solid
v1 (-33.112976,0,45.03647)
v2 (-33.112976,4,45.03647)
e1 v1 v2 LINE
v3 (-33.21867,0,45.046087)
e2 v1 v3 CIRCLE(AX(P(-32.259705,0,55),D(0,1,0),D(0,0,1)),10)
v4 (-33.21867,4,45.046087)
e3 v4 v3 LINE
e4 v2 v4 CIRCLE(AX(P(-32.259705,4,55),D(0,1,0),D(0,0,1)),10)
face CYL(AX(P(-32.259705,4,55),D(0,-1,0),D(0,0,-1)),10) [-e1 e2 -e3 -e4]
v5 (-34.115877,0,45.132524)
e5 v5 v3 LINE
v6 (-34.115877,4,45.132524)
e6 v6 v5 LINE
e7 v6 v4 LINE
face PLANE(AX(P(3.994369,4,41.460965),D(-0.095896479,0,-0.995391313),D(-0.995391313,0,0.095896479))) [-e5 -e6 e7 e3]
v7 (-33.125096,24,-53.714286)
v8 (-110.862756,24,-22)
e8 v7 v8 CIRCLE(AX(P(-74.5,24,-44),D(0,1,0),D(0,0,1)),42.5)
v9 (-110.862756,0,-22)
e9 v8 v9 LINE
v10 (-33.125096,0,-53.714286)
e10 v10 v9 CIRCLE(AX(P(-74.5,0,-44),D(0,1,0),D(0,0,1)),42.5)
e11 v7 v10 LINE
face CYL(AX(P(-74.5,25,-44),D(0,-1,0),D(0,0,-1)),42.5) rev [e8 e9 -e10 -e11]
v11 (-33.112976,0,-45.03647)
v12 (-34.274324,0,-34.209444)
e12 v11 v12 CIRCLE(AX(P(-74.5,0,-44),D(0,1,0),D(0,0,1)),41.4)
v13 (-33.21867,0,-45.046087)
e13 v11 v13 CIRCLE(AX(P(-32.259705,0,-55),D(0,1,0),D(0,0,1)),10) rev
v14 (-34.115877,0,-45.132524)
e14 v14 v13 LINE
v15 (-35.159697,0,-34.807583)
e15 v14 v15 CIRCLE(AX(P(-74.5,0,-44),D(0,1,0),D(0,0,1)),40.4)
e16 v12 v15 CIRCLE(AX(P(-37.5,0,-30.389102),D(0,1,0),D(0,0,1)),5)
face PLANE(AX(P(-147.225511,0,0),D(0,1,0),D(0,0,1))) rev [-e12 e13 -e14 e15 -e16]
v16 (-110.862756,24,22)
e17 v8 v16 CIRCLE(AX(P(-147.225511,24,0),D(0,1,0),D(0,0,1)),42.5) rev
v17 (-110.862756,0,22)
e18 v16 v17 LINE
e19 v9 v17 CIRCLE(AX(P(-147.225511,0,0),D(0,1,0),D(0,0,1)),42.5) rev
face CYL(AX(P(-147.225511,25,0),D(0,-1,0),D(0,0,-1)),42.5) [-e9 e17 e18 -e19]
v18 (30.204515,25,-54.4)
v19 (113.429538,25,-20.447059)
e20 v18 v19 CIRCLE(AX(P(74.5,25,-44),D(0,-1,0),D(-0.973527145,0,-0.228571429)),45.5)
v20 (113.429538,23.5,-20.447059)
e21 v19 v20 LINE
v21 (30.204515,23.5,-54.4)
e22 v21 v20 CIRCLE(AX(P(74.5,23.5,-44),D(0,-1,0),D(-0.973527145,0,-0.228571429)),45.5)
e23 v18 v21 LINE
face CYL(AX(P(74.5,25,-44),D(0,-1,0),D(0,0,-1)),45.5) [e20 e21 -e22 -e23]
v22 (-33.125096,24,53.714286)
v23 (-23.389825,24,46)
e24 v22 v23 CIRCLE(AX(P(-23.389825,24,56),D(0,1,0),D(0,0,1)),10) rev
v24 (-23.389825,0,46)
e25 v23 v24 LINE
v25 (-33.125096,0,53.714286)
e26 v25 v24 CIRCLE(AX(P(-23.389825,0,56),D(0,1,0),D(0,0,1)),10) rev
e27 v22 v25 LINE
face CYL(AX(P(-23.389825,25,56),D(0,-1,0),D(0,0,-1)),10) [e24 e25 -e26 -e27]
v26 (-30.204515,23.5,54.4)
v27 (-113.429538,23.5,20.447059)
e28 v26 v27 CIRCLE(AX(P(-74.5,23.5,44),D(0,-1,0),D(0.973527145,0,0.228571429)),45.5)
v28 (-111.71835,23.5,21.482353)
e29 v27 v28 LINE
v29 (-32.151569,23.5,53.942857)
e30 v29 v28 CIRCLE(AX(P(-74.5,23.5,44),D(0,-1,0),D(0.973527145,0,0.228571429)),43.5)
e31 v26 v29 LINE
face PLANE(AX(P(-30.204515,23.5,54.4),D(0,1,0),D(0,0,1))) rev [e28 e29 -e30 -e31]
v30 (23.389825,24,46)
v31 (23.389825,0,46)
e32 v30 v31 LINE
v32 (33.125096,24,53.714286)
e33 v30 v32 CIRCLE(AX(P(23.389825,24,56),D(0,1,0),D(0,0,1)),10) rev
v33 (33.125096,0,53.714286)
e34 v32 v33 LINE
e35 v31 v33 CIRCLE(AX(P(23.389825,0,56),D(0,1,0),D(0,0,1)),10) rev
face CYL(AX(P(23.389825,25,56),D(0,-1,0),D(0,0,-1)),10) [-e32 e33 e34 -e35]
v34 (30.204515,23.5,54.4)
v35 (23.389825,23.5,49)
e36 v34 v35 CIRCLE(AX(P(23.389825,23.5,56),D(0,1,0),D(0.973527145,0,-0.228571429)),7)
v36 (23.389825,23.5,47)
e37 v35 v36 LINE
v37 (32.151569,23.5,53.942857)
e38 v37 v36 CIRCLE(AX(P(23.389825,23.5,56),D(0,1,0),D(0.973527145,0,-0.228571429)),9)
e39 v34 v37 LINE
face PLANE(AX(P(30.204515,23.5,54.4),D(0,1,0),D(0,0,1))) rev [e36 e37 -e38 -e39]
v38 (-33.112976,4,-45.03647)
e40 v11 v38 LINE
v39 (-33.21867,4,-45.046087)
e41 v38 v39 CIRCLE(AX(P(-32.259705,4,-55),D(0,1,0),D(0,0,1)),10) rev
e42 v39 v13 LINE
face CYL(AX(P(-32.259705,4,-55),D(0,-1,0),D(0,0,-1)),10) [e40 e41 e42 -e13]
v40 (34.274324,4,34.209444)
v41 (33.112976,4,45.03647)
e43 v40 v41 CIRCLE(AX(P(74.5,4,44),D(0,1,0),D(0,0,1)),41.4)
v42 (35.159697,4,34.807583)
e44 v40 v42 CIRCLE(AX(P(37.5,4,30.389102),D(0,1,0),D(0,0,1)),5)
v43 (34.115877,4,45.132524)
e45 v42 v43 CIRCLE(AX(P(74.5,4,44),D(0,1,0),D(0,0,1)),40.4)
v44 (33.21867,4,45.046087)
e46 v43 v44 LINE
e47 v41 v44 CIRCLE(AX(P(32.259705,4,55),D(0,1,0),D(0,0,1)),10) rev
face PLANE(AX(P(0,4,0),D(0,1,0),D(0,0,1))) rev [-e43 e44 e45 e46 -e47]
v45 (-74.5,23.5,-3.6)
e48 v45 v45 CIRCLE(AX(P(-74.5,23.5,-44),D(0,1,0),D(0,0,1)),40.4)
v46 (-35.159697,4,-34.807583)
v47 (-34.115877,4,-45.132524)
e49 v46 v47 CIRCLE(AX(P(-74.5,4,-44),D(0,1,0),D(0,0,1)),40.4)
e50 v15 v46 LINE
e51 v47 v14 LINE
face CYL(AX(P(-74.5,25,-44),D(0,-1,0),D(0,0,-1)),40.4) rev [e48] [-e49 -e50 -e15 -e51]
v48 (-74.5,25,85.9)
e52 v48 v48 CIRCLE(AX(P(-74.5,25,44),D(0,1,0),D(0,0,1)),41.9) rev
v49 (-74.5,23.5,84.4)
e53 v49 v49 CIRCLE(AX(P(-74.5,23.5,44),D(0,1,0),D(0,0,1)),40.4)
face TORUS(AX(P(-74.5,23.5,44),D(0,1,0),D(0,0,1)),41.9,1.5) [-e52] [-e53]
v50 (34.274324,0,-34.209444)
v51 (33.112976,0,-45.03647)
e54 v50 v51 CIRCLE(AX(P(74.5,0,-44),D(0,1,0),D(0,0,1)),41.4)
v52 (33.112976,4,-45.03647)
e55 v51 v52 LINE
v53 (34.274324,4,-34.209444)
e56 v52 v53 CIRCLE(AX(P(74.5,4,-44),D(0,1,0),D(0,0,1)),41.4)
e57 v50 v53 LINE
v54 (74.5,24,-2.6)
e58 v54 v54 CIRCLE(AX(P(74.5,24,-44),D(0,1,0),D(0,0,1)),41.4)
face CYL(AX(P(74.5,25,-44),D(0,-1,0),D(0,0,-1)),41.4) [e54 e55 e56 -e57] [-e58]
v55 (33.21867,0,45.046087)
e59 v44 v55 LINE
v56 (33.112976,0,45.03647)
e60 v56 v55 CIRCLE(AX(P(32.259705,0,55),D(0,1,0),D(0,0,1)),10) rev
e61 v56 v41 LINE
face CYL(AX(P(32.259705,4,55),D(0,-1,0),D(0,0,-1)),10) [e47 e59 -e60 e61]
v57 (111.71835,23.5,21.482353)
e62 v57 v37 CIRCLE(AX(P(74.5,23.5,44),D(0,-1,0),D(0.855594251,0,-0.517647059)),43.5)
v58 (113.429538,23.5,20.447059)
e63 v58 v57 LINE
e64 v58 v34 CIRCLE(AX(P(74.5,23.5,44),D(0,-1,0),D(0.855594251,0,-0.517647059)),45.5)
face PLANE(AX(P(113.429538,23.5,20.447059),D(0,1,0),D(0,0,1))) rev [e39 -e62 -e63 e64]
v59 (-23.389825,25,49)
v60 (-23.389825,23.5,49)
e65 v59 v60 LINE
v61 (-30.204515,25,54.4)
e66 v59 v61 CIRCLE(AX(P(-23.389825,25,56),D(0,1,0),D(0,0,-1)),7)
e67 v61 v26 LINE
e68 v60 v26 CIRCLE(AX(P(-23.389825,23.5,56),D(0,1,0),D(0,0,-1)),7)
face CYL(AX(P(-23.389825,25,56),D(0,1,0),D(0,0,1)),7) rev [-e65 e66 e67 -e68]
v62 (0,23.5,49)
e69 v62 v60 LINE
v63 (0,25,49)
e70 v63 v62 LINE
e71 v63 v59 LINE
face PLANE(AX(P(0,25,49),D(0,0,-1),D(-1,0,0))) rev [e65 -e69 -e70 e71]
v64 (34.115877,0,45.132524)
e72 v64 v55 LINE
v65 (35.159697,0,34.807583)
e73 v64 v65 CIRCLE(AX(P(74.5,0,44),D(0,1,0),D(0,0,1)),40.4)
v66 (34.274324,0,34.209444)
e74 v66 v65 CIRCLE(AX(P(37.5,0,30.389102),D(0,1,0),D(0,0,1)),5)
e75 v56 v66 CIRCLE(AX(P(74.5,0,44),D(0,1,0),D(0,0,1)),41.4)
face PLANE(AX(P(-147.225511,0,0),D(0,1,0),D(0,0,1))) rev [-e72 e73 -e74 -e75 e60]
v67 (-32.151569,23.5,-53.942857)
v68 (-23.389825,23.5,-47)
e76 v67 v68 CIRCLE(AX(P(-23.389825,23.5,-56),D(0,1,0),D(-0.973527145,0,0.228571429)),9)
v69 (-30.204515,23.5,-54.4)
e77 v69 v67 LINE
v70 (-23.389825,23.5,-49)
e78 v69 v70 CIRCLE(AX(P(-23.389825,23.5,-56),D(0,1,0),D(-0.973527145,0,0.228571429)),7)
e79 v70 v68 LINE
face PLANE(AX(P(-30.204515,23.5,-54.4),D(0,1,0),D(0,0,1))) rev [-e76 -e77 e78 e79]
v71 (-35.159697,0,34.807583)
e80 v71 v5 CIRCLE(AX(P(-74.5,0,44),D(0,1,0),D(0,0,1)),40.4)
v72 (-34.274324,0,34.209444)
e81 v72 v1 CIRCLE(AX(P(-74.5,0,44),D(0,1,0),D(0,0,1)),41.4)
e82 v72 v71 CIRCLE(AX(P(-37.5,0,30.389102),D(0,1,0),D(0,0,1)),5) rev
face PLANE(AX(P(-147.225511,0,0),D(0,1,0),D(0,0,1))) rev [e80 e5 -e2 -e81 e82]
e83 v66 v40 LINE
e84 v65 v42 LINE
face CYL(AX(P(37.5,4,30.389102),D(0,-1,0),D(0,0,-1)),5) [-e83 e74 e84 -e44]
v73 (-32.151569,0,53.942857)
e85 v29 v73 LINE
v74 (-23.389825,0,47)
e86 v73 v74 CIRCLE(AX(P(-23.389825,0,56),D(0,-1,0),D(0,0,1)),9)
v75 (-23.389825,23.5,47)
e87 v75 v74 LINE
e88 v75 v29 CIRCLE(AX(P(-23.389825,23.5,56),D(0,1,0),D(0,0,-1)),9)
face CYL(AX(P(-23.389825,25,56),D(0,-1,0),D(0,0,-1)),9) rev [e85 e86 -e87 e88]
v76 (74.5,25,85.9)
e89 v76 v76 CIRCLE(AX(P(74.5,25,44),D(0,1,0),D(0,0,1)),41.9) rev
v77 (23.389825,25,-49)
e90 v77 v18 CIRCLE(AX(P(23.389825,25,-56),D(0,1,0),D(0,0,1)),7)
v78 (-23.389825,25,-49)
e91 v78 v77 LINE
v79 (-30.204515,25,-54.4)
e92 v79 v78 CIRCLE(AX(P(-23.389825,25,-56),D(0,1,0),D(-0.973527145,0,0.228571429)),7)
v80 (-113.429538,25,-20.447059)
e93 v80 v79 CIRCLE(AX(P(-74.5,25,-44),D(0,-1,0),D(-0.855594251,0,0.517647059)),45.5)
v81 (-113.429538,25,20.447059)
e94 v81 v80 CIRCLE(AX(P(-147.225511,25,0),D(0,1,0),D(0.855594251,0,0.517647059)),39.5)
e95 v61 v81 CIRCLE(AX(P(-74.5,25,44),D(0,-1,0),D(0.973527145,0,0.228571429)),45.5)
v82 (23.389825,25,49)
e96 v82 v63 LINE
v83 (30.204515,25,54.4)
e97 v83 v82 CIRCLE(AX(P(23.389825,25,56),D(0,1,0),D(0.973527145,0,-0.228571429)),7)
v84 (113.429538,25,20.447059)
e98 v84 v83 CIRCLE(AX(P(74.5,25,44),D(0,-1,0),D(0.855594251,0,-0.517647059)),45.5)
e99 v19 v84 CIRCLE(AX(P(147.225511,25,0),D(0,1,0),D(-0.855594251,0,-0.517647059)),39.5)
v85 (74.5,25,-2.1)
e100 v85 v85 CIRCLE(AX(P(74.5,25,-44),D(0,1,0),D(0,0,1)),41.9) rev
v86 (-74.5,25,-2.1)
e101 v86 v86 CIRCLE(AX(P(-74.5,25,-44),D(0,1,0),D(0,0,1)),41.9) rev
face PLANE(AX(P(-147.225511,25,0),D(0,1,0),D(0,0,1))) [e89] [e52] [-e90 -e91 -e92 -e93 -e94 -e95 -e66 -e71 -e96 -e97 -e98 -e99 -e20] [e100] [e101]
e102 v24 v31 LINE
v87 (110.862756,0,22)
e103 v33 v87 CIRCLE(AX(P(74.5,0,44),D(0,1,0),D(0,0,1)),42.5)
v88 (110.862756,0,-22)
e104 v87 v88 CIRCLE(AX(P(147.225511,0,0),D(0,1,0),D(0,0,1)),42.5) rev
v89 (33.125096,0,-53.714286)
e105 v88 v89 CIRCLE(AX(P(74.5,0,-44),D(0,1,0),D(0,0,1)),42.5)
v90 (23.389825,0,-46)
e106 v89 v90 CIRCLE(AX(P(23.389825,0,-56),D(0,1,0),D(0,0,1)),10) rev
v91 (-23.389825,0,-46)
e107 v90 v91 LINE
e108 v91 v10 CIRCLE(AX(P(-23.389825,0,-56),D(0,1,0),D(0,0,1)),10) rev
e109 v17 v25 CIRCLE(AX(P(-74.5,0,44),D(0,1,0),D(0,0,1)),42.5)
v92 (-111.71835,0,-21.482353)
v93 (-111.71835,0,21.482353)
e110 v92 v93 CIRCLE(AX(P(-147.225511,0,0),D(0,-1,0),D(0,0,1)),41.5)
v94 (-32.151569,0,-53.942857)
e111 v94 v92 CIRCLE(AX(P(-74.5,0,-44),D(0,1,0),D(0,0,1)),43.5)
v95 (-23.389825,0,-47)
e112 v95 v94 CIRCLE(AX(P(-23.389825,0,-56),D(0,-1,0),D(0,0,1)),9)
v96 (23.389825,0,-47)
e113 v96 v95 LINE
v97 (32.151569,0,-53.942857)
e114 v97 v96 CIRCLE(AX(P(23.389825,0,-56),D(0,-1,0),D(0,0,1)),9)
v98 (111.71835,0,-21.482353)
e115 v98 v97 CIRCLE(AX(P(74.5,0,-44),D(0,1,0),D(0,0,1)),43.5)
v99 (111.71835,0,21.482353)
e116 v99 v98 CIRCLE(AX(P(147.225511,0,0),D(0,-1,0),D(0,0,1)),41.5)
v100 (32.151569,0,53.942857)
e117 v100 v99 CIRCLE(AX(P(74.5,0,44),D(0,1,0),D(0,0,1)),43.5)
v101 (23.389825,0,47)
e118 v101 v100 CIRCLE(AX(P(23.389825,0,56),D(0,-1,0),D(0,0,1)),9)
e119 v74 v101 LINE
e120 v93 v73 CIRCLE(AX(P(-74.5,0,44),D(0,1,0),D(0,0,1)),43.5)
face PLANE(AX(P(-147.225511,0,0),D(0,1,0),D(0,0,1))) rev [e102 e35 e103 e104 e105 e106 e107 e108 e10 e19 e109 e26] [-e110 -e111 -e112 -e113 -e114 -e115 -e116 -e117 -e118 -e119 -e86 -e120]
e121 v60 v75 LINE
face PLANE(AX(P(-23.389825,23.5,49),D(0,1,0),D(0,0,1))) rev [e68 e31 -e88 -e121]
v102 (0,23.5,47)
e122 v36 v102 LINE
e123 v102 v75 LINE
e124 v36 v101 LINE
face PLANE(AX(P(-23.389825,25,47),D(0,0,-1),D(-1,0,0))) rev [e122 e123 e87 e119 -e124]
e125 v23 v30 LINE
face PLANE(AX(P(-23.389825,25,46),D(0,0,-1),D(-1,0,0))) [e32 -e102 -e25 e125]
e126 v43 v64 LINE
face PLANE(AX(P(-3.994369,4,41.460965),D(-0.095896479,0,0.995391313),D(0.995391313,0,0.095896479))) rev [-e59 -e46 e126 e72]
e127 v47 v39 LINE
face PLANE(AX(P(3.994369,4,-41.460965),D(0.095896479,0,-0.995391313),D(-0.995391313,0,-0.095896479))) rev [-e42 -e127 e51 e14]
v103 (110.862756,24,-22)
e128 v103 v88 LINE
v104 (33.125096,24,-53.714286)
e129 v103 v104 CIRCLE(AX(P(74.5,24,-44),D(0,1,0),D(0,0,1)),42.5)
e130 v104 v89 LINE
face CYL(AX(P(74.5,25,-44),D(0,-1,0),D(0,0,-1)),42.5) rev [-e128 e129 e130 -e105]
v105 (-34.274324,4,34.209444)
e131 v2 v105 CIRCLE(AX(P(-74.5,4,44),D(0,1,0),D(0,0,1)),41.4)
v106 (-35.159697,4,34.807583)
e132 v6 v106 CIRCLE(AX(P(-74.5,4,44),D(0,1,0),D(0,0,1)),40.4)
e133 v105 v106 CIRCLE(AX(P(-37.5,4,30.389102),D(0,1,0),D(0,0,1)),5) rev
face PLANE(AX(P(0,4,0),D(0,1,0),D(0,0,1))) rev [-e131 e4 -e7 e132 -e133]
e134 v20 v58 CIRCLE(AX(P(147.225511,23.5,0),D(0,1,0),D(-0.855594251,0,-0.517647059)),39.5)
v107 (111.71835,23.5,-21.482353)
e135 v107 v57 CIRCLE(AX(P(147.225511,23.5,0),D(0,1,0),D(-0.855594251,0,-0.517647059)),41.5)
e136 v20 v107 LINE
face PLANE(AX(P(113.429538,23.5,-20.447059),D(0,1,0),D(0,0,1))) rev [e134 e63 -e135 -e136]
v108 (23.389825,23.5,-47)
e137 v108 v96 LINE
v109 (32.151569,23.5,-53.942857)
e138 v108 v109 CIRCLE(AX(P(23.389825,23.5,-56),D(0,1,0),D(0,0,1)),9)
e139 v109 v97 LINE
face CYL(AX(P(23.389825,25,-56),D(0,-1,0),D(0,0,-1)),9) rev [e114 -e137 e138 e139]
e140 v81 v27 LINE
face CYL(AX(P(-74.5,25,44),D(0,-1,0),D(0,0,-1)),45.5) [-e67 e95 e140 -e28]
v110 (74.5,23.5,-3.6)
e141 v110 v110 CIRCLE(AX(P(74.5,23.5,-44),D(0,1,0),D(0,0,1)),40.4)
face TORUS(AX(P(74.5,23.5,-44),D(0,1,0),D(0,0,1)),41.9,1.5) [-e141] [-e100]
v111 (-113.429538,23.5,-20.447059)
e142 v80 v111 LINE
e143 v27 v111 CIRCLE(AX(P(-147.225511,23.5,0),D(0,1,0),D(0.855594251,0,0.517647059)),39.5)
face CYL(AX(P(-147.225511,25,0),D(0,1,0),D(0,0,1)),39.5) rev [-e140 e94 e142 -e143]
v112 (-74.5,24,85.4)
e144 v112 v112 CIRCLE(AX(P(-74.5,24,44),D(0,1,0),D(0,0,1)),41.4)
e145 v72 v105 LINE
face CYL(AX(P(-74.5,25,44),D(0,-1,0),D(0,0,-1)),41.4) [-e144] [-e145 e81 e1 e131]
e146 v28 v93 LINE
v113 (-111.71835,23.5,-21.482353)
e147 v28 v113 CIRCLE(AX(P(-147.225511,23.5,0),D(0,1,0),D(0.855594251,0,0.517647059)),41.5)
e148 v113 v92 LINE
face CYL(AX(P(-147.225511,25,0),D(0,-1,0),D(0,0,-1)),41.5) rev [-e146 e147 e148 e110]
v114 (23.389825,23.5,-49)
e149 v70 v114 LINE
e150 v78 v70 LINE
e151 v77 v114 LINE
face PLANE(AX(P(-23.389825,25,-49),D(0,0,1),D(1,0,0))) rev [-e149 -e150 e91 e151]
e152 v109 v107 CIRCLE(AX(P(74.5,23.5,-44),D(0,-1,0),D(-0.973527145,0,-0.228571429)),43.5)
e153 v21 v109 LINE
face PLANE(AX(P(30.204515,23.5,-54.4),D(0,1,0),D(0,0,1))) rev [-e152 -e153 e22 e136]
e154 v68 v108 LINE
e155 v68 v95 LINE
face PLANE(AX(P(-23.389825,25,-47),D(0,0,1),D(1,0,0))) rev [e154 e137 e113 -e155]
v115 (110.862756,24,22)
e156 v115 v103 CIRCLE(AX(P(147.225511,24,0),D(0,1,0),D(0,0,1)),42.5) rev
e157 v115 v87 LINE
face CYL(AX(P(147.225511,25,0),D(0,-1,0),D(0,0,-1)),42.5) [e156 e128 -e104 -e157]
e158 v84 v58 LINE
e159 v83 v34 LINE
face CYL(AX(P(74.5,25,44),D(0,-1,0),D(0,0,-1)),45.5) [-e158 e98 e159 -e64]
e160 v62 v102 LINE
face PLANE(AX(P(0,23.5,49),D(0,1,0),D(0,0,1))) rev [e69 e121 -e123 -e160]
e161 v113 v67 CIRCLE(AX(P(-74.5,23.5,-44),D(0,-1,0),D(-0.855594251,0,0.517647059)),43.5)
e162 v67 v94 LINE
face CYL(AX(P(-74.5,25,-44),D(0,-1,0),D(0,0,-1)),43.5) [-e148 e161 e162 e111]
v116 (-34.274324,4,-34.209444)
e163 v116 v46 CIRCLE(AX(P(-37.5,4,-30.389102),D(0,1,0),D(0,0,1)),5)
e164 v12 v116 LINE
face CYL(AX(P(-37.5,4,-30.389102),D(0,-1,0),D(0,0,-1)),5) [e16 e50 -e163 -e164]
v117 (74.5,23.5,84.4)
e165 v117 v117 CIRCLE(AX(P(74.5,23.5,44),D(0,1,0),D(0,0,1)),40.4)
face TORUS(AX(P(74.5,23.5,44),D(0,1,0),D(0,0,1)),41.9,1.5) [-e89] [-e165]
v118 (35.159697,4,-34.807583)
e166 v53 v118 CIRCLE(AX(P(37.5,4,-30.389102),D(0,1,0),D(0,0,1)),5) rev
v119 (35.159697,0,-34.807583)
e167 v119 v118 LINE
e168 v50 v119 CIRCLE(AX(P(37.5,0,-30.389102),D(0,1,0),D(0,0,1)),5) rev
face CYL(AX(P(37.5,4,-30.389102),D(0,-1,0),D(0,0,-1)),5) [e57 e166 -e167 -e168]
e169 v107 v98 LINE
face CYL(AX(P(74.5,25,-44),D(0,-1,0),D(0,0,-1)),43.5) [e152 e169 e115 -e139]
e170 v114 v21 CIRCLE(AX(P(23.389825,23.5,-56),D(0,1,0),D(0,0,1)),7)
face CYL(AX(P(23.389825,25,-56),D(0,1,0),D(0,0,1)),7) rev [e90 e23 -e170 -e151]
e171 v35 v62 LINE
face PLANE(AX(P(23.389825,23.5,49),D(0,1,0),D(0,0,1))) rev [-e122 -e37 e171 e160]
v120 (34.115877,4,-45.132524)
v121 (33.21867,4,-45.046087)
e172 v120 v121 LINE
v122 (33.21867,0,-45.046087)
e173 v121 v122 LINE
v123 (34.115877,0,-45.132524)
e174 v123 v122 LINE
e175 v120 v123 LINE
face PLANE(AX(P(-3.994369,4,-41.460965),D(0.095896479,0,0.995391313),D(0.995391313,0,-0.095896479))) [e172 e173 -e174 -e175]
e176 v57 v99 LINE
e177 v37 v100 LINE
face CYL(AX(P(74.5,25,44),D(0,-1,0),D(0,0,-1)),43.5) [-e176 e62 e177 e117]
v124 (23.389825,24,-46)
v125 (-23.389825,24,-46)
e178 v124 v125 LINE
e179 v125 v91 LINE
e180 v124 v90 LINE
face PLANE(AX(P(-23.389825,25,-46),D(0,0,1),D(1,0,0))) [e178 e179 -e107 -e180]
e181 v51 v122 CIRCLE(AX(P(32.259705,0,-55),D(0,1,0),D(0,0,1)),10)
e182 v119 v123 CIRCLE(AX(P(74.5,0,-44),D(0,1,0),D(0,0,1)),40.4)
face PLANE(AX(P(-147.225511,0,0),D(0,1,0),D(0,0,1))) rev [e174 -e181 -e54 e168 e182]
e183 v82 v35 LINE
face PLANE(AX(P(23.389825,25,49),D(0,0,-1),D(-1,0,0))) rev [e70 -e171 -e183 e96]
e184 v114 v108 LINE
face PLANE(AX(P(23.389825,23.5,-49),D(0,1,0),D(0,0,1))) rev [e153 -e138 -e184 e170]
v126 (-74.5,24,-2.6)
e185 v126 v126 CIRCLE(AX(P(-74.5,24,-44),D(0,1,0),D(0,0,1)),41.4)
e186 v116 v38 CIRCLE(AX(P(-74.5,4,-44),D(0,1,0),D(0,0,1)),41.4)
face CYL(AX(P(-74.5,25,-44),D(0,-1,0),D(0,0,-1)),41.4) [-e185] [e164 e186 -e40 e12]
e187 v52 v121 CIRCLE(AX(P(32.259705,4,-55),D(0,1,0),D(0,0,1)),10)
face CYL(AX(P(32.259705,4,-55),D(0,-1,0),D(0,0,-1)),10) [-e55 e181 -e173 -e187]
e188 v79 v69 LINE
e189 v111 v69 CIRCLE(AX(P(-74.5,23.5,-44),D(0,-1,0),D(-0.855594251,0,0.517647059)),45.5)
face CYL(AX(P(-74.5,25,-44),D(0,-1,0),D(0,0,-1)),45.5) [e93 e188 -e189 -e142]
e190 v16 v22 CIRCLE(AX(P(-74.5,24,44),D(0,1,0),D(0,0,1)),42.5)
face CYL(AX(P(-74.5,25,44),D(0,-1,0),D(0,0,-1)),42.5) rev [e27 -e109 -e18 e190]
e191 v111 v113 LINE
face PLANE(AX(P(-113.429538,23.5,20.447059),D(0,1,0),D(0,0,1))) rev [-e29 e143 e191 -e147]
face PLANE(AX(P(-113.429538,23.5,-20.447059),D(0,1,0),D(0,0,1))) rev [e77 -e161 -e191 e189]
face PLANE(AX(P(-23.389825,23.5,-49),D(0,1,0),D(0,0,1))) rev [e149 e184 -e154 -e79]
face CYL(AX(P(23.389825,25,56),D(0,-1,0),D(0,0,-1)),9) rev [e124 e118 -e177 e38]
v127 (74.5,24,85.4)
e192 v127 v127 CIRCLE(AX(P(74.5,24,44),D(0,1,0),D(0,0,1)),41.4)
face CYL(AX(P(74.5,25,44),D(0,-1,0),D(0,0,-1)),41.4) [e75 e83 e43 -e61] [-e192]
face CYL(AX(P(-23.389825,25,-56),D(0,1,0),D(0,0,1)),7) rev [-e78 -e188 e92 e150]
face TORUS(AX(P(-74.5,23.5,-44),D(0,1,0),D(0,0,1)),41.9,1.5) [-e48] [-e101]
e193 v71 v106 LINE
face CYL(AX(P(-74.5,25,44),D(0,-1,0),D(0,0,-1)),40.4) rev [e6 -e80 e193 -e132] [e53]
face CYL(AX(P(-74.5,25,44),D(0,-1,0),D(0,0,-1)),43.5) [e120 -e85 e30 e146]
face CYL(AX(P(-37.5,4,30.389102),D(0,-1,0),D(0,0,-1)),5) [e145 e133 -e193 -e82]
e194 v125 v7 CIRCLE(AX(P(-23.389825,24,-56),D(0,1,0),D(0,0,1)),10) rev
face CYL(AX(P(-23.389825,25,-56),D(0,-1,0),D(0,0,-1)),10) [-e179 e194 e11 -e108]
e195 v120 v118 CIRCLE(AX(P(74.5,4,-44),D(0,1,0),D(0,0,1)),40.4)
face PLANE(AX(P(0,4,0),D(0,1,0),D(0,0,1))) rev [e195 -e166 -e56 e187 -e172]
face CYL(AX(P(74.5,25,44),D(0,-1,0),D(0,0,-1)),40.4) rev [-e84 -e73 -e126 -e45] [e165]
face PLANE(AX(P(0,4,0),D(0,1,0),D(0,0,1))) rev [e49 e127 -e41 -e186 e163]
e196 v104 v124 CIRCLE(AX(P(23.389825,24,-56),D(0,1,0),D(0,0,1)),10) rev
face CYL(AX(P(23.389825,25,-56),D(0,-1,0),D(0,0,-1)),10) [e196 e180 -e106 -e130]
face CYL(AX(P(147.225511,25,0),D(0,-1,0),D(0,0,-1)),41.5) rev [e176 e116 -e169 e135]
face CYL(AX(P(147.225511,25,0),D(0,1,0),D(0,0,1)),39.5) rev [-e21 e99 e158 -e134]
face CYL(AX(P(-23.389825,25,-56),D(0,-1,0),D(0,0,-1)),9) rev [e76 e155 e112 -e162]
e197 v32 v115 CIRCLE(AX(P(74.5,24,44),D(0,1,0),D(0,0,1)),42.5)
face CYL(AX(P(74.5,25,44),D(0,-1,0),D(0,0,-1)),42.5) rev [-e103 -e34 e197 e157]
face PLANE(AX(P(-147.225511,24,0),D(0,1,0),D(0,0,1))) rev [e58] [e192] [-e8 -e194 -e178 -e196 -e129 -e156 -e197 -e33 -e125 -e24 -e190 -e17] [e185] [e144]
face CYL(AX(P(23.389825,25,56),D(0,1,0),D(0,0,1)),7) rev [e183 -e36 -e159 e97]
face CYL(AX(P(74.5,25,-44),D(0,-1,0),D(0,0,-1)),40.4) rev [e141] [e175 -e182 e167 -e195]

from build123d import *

# Parameters (mm, degrees)
SKETCH1_R           = 40.4
BOSS_EXTRUDE1_DEPTH = 25
SHELL1_T            = -1
FILLET1_R           = 1.5
SWEEP3_START        = 23.5
SWEEP3_DEPTH        = 1.5
CUT_EXTRUDE1_DEPTH  = 4


# Read off the part's stored shape, not the designer's step: Sweep3
with BuildPart() as part:
    # Sketch1 → Boss-Extrude1 (new body)
    with BuildSketch(Plane(origin=(0, 0, 0), x_dir=(1, 0, 0), z_dir=(0, 1, 0))):
        with BuildLine():
            Line((-23.389824888, -47), (23.389824888, -47))
            ThreePointArc((23.389824888, -47), (28.979355918, -48.946125685), (32.151569193, -53.942857143))
            ThreePointArc((32.151569193, -53.942857143), (90.931692418, -84.277158344), (111.718349922, -21.482352941))
            ThreePointArc((111.718349922, -21.482352941), (105.725511342, 0), (111.718349922, 21.482352941))
            ThreePointArc((111.718349922, 21.482352941), (90.931692418, 84.277158344), (32.151569193, 53.942857143))
            ThreePointArc((32.151569193, 53.942857143), (28.979355918, 48.946125685), (23.389824888, 47))
            Line((23.389824888, 47), (-23.389824888, 47))
            ThreePointArc((-23.389824888, 47), (-28.979355918, 48.946125685), (-32.151569193, 53.942857143))
            ThreePointArc((-32.151569193, 53.942857143), (-90.931692418, 84.277158344), (-111.718349922, 21.482352941))
            ThreePointArc((-111.718349922, 21.482352941), (-105.725511342, 0), (-111.718349922, -21.482352941))
            ThreePointArc((-111.718349922, -21.482352941), (-90.931692418, -84.277158344), (-32.151569193, -53.942857143))
            ThreePointArc((-32.151569193, -53.942857143), (-28.979355918, -48.946125685), (-23.389824888, -47))
        make_face()
        with Locations(Location((74.5, -44, 0), (0, 0, 270))):
            Circle(SKETCH1_R, mode=Mode.SUBTRACT)
        with Locations(Location((74.5, 44, 0), (0, 0, 270))):
            Circle(SKETCH1_R, mode=Mode.SUBTRACT)
        with Locations(Location((-74.5, 44, 0), (0, 0, 270))):
            Circle(SKETCH1_R, mode=Mode.SUBTRACT)
        with Locations(Location((-74.5, -44, 0), (0, 0, 270))):
            Circle(SKETCH1_R, mode=Mode.SUBTRACT)
    extrude(amount=BOSS_EXTRUDE1_DEPTH)

    # Shell1
    shell1_openings = [part.faces().sort_by_distance(p)[0] for p in [
        (0, 0, 0),
    ]]
    offset(amount=SHELL1_T, openings=shell1_openings, kind=Kind.INTERSECTION)

    # Fillet1
    fillet1_edges = [part.edges().sort_by_distance(p)[0] for p in [
        (74.5, 25, 3.6),
        (74.5, 25, -84.4),
        (-74.5, 25, -84.4),
        (-74.5, 25, 3.6),
    ]]
    fillet(fillet1_edges, radius=FILLET1_R)

    # Sweep3 outline → Sweep3 (add)
    with BuildSketch(Plane(origin=(0, 0, 0), x_dir=(1, 0, 0), z_dir=(0, 1, 0)).offset(SWEEP3_START)):
        with BuildLine():
            Line((-23.389824888, -49), (23.389824888, -49))
            ThreePointArc((23.389824888, -49), (27.737237912, -50.51365331), (30.204514903, -54.4))
            ThreePointArc((30.204514903, -54.4), (91.687172529, -86.128981716), (113.429538424, -20.447058824))
            ThreePointArc((113.429538424, -20.447058824), (107.725511342, 0), (113.429538424, 20.447058824))
            ThreePointArc((113.429538424, 20.447058824), (91.687172529, 86.128981716), (30.204514903, 54.4))
            ThreePointArc((30.204514903, 54.4), (27.737237912, 50.51365331), (23.389824888, 49))
            Line((23.389824888, 49), (-23.389824888, 49))
            ThreePointArc((-23.389824888, 49), (-27.737237912, 50.51365331), (-30.204514903, 54.4))
            ThreePointArc((-30.204514903, 54.4), (-91.687172529, 86.128981716), (-113.429538424, 20.447058824))
            ThreePointArc((-113.429538424, 20.447058824), (-107.725511342, 0), (-113.429538424, -20.447058824))
            ThreePointArc((-113.429538424, -20.447058824), (-91.687172529, -86.128981716), (-30.204514903, -54.4))
            ThreePointArc((-30.204514903, -54.4), (-27.737237912, -50.51365331), (-23.389824888, -49))
        make_face()
        with BuildLine():
            ThreePointArc((-111.718349922, -21.482352941), (-105.725511342, 0), (-111.718349922, 21.482352941))
            ThreePointArc((-111.718349922, 21.482352941), (-90.931692418, 84.277158344), (-32.151569193, 53.942857143))
            ThreePointArc((-32.151569193, 53.942857143), (-28.979355918, 48.946125685), (-23.389824888, 47))
            Line((-23.389824888, 47), (23.389824888, 47))
            ThreePointArc((23.389824888, 47), (28.979355918, 48.946125685), (32.151569193, 53.942857143))
            ThreePointArc((32.151569193, 53.942857143), (90.931692418, 84.277158344), (111.718349922, 21.482352941))
            ThreePointArc((111.718349922, 21.482352941), (105.725511342, 0), (111.718349922, -21.482352941))
            ThreePointArc((111.718349922, -21.482352941), (90.931692418, -84.277158344), (32.151569193, -53.942857143))
            ThreePointArc((32.151569193, -53.942857143), (28.979355918, -48.946125685), (23.389824888, -47))
            Line((23.389824888, -47), (-23.389824888, -47))
            ThreePointArc((-23.389824888, -47), (-28.979355918, -48.946125685), (-32.151569193, -53.942857143))
            ThreePointArc((-32.151569193, -53.942857143), (-90.931692418, -84.277158344), (-111.718349922, -21.482352941))
        make_face(mode=Mode.SUBTRACT)
    extrude(amount=SWEEP3_DEPTH)

    # Sketch11 → Cut-Extrude1 (cut)
    with BuildSketch(Plane(origin=(0, 0, 0), x_dir=(1, 0, 0), z_dir=(0, 1, 0))):
        with BuildLine():
            Line((-33.218669872, 45.046086874), (-34.11587702, 45.132524243))
            ThreePointArc((-34.11587702, 45.132524243), (-34.304886561, 39.936398688), (-35.15969651, 34.807583489))
            ThreePointArc((-35.15969651, 34.807583489), (-34.700986823, 34.532231781), (-34.274323948, 34.20944403))
            ThreePointArc((-34.274323948, 34.20944403), (-33.336128547, 39.584607949), (-33.112976312, 45.036470093))
            ThreePointArc((-33.112976312, 45.036470093), (-33.16583585, 45.041138266), (-33.218669872, 45.046086874))
        make_face()
        with BuildLine():
            ThreePointArc((33.218669872, 45.046086874), (33.16583585, 45.041138266), (33.112976312, 45.036470093))
            ThreePointArc((33.112976312, 45.036470093), (33.336128547, 39.584607949), (34.274323948, 34.20944403))
            ThreePointArc((34.274323948, 34.20944403), (34.700986823, 34.532231781), (35.15969651, 34.807583489))
            ThreePointArc((35.15969651, 34.807583489), (34.304886561, 39.936398688), (34.11587702, 45.132524243))
            Line((34.11587702, 45.132524243), (33.218669872, 45.046086874))
        make_face()
        with BuildLine():
            ThreePointArc((-33.112976312, -45.036470093), (-33.336128547, -39.584607949), (-34.274323948, -34.20944403))
            ThreePointArc((-34.274323948, -34.20944403), (-34.700986823, -34.532231781), (-35.15969651, -34.807583489))
            ThreePointArc((-35.15969651, -34.807583489), (-34.304886561, -39.936398688), (-34.11587702, -45.132524243))
            Line((-34.11587702, -45.132524243), (-33.218669872, -45.046086874))
            ThreePointArc((-33.218669872, -45.046086874), (-33.16583585, -45.041138266), (-33.112976312, -45.036470093))
        make_face()
        with BuildLine():
            ThreePointArc((35.15969651, -34.807583489), (34.700986823, -34.532231781), (34.274323948, -34.20944403))
            ThreePointArc((34.274323948, -34.20944403), (33.336128547, -39.584607949), (33.112976312, -45.036470093))
            ThreePointArc((33.112976312, -45.036470093), (33.16583585, -45.041138266), (33.218669872, -45.046086874))
            Line((33.218669872, -45.046086874), (34.11587702, -45.132524243))
            ThreePointArc((34.11587702, -45.132524243), (34.304886561, -39.936398688), (35.15969651, -34.807583489))
        make_face()
    extrude(amount=CUT_EXTRUDE1_DEPTH, mode=Mode.SUBTRACT)


solid = part.part
